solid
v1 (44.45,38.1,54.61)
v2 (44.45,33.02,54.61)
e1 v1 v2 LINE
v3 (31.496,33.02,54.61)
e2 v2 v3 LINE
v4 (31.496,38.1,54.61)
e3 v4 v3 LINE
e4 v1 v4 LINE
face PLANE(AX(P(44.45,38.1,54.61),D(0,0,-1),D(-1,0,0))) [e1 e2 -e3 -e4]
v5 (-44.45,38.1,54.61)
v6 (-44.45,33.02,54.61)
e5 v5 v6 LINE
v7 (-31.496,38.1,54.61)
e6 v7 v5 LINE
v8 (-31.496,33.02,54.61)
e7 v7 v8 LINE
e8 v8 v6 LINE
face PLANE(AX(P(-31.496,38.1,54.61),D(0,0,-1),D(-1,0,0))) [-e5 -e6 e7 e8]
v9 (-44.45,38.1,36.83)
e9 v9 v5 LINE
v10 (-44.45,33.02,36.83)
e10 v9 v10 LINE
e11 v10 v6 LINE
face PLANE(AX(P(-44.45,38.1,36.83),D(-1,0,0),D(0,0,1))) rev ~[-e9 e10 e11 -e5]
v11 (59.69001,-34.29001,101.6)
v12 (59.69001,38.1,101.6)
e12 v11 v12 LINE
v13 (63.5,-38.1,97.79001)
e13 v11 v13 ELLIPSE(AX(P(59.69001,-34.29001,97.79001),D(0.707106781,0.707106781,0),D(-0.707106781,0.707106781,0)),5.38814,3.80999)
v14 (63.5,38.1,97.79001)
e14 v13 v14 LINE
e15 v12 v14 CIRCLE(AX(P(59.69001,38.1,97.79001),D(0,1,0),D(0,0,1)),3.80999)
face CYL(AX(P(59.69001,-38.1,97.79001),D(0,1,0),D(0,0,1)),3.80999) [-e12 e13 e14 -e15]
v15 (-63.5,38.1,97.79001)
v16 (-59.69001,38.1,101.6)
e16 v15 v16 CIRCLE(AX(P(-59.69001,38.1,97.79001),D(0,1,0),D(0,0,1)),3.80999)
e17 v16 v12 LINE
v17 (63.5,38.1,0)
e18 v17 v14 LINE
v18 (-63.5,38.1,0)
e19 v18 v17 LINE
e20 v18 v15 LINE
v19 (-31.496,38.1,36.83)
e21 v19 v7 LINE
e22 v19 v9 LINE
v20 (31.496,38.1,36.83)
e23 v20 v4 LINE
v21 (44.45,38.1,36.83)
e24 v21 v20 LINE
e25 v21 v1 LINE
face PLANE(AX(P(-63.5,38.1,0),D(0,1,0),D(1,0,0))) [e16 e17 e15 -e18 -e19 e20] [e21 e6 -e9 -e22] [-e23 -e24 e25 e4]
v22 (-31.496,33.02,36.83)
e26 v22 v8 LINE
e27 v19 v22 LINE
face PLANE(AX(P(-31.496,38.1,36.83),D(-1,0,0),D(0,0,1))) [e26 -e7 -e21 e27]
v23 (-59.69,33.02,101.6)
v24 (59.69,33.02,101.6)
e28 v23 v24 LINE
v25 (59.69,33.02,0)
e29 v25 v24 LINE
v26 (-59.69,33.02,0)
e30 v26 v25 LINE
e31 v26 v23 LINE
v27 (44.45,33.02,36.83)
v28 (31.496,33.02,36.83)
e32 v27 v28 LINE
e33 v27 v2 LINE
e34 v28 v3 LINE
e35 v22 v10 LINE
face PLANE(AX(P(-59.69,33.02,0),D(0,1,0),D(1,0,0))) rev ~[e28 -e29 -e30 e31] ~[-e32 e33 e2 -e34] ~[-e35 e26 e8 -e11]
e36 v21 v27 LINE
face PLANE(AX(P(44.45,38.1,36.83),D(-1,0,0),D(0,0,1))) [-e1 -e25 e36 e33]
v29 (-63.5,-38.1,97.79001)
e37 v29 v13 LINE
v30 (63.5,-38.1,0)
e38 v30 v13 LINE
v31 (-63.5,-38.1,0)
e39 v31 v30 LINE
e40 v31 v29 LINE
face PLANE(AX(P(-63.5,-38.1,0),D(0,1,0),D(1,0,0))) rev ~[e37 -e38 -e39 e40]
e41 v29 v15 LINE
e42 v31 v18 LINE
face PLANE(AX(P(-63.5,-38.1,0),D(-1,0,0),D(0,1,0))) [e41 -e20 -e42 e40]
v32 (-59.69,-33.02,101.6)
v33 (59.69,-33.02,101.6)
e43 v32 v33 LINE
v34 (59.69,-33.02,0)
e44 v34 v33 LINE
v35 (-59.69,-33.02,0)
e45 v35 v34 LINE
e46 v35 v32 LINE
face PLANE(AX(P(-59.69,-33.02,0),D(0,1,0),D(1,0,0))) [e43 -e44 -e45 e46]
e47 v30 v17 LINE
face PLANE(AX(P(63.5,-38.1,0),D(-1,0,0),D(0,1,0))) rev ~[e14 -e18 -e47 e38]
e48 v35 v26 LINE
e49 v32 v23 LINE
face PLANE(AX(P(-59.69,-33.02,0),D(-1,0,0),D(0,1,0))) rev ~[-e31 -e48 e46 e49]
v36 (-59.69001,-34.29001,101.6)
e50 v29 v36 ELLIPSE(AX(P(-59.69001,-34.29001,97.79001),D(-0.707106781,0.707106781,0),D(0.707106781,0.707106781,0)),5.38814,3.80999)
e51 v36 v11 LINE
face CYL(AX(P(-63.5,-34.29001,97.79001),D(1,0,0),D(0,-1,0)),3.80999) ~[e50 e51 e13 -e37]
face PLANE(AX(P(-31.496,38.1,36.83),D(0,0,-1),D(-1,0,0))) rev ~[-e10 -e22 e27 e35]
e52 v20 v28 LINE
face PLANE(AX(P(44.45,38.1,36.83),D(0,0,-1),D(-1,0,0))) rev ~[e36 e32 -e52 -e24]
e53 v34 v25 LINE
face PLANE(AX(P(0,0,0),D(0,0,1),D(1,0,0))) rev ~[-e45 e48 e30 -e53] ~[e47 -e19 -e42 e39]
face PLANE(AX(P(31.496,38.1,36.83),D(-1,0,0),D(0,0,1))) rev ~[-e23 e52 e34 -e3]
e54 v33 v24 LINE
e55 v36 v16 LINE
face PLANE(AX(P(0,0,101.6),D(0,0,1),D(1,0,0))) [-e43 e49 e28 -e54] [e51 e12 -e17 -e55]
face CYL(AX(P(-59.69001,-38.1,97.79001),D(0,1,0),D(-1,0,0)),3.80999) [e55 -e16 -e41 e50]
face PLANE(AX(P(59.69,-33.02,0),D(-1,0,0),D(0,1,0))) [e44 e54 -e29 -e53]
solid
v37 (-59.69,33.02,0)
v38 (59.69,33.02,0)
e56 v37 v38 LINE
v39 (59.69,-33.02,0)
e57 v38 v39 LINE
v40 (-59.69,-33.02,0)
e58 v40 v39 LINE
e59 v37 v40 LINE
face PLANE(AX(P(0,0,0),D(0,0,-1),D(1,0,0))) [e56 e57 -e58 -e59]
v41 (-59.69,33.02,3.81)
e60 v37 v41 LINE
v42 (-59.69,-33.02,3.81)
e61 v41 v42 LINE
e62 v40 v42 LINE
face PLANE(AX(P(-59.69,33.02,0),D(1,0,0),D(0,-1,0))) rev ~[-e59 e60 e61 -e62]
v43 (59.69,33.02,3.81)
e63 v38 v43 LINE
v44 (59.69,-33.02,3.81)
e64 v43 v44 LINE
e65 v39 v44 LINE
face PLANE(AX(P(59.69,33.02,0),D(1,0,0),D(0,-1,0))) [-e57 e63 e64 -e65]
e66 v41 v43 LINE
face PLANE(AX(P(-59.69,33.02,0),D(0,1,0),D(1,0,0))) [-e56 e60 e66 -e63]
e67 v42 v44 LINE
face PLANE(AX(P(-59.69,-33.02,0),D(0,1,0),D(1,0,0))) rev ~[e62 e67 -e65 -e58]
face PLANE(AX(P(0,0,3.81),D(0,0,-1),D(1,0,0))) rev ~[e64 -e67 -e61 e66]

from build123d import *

# Parameters (mm, degrees)
F0_W     = 127
F0_H     = 76.2
F0_W_2   = 119.38
F0_H_2   = 66.04
F1_DEPTH = 101.6
F2_W     = 12.954
F2_H     = 17.78
F3_DEPTH = 5.08
F4_W     = 119.38
F4_H     = 66.04
F5_DEPTH = 3.81
F6_R     = 3.80999


# Not quite as in the source:
# - a fillet or chamfer is up to 0.001 mm smaller than in the source, because OpenCascade refuses the exact size


with BuildPart() as f1:
    # F0 (on Top) → F1 (new body)
    with BuildSketch(Plane.XY):
        Rectangle(F0_W, F0_H)
        Rectangle(F0_W_2, F0_H_2, mode=Mode.SUBTRACT)
    extrude(amount=F1_DEPTH)

    # F2 (on face) → F3 (cut, through all)
    with BuildSketch(Plane(origin=(0, 38.1, 0), x_dir=(-1, 0, 0), z_dir=(0, 1, 0))):
        with Locations((-37.973, 45.72)):
            Rectangle(F2_W, F2_H)
        with Locations((37.973, 45.72)):
            Rectangle(F2_W, F2_H)
    extrude(amount=-F3_DEPTH, mode=Mode.SUBTRACT)

    # F6 (radius 3.81 in the source; OpenCascade refuses exactly that, so slightly less here)
    f6_edges = [f1.edges().sort_by_distance(p)[0] for p in [
        (63.5, 0, 101.6),
        (0, -38.1, 101.6),
        (-63.5, 0, 101.6),
    ]]
    fillet(f6_edges, radius=F6_R)


with BuildPart() as f5:
    # F4 (on face) → F5 (new body)
    with BuildSketch(Plane(origin=(0, 0, 0), x_dir=(1, 0, 0), z_dir=(0, 0, -1))):
        Rectangle(F4_W, F4_H)
    extrude(amount=-F5_DEPTH)


solid = Compound([f1.part, f5.part])
